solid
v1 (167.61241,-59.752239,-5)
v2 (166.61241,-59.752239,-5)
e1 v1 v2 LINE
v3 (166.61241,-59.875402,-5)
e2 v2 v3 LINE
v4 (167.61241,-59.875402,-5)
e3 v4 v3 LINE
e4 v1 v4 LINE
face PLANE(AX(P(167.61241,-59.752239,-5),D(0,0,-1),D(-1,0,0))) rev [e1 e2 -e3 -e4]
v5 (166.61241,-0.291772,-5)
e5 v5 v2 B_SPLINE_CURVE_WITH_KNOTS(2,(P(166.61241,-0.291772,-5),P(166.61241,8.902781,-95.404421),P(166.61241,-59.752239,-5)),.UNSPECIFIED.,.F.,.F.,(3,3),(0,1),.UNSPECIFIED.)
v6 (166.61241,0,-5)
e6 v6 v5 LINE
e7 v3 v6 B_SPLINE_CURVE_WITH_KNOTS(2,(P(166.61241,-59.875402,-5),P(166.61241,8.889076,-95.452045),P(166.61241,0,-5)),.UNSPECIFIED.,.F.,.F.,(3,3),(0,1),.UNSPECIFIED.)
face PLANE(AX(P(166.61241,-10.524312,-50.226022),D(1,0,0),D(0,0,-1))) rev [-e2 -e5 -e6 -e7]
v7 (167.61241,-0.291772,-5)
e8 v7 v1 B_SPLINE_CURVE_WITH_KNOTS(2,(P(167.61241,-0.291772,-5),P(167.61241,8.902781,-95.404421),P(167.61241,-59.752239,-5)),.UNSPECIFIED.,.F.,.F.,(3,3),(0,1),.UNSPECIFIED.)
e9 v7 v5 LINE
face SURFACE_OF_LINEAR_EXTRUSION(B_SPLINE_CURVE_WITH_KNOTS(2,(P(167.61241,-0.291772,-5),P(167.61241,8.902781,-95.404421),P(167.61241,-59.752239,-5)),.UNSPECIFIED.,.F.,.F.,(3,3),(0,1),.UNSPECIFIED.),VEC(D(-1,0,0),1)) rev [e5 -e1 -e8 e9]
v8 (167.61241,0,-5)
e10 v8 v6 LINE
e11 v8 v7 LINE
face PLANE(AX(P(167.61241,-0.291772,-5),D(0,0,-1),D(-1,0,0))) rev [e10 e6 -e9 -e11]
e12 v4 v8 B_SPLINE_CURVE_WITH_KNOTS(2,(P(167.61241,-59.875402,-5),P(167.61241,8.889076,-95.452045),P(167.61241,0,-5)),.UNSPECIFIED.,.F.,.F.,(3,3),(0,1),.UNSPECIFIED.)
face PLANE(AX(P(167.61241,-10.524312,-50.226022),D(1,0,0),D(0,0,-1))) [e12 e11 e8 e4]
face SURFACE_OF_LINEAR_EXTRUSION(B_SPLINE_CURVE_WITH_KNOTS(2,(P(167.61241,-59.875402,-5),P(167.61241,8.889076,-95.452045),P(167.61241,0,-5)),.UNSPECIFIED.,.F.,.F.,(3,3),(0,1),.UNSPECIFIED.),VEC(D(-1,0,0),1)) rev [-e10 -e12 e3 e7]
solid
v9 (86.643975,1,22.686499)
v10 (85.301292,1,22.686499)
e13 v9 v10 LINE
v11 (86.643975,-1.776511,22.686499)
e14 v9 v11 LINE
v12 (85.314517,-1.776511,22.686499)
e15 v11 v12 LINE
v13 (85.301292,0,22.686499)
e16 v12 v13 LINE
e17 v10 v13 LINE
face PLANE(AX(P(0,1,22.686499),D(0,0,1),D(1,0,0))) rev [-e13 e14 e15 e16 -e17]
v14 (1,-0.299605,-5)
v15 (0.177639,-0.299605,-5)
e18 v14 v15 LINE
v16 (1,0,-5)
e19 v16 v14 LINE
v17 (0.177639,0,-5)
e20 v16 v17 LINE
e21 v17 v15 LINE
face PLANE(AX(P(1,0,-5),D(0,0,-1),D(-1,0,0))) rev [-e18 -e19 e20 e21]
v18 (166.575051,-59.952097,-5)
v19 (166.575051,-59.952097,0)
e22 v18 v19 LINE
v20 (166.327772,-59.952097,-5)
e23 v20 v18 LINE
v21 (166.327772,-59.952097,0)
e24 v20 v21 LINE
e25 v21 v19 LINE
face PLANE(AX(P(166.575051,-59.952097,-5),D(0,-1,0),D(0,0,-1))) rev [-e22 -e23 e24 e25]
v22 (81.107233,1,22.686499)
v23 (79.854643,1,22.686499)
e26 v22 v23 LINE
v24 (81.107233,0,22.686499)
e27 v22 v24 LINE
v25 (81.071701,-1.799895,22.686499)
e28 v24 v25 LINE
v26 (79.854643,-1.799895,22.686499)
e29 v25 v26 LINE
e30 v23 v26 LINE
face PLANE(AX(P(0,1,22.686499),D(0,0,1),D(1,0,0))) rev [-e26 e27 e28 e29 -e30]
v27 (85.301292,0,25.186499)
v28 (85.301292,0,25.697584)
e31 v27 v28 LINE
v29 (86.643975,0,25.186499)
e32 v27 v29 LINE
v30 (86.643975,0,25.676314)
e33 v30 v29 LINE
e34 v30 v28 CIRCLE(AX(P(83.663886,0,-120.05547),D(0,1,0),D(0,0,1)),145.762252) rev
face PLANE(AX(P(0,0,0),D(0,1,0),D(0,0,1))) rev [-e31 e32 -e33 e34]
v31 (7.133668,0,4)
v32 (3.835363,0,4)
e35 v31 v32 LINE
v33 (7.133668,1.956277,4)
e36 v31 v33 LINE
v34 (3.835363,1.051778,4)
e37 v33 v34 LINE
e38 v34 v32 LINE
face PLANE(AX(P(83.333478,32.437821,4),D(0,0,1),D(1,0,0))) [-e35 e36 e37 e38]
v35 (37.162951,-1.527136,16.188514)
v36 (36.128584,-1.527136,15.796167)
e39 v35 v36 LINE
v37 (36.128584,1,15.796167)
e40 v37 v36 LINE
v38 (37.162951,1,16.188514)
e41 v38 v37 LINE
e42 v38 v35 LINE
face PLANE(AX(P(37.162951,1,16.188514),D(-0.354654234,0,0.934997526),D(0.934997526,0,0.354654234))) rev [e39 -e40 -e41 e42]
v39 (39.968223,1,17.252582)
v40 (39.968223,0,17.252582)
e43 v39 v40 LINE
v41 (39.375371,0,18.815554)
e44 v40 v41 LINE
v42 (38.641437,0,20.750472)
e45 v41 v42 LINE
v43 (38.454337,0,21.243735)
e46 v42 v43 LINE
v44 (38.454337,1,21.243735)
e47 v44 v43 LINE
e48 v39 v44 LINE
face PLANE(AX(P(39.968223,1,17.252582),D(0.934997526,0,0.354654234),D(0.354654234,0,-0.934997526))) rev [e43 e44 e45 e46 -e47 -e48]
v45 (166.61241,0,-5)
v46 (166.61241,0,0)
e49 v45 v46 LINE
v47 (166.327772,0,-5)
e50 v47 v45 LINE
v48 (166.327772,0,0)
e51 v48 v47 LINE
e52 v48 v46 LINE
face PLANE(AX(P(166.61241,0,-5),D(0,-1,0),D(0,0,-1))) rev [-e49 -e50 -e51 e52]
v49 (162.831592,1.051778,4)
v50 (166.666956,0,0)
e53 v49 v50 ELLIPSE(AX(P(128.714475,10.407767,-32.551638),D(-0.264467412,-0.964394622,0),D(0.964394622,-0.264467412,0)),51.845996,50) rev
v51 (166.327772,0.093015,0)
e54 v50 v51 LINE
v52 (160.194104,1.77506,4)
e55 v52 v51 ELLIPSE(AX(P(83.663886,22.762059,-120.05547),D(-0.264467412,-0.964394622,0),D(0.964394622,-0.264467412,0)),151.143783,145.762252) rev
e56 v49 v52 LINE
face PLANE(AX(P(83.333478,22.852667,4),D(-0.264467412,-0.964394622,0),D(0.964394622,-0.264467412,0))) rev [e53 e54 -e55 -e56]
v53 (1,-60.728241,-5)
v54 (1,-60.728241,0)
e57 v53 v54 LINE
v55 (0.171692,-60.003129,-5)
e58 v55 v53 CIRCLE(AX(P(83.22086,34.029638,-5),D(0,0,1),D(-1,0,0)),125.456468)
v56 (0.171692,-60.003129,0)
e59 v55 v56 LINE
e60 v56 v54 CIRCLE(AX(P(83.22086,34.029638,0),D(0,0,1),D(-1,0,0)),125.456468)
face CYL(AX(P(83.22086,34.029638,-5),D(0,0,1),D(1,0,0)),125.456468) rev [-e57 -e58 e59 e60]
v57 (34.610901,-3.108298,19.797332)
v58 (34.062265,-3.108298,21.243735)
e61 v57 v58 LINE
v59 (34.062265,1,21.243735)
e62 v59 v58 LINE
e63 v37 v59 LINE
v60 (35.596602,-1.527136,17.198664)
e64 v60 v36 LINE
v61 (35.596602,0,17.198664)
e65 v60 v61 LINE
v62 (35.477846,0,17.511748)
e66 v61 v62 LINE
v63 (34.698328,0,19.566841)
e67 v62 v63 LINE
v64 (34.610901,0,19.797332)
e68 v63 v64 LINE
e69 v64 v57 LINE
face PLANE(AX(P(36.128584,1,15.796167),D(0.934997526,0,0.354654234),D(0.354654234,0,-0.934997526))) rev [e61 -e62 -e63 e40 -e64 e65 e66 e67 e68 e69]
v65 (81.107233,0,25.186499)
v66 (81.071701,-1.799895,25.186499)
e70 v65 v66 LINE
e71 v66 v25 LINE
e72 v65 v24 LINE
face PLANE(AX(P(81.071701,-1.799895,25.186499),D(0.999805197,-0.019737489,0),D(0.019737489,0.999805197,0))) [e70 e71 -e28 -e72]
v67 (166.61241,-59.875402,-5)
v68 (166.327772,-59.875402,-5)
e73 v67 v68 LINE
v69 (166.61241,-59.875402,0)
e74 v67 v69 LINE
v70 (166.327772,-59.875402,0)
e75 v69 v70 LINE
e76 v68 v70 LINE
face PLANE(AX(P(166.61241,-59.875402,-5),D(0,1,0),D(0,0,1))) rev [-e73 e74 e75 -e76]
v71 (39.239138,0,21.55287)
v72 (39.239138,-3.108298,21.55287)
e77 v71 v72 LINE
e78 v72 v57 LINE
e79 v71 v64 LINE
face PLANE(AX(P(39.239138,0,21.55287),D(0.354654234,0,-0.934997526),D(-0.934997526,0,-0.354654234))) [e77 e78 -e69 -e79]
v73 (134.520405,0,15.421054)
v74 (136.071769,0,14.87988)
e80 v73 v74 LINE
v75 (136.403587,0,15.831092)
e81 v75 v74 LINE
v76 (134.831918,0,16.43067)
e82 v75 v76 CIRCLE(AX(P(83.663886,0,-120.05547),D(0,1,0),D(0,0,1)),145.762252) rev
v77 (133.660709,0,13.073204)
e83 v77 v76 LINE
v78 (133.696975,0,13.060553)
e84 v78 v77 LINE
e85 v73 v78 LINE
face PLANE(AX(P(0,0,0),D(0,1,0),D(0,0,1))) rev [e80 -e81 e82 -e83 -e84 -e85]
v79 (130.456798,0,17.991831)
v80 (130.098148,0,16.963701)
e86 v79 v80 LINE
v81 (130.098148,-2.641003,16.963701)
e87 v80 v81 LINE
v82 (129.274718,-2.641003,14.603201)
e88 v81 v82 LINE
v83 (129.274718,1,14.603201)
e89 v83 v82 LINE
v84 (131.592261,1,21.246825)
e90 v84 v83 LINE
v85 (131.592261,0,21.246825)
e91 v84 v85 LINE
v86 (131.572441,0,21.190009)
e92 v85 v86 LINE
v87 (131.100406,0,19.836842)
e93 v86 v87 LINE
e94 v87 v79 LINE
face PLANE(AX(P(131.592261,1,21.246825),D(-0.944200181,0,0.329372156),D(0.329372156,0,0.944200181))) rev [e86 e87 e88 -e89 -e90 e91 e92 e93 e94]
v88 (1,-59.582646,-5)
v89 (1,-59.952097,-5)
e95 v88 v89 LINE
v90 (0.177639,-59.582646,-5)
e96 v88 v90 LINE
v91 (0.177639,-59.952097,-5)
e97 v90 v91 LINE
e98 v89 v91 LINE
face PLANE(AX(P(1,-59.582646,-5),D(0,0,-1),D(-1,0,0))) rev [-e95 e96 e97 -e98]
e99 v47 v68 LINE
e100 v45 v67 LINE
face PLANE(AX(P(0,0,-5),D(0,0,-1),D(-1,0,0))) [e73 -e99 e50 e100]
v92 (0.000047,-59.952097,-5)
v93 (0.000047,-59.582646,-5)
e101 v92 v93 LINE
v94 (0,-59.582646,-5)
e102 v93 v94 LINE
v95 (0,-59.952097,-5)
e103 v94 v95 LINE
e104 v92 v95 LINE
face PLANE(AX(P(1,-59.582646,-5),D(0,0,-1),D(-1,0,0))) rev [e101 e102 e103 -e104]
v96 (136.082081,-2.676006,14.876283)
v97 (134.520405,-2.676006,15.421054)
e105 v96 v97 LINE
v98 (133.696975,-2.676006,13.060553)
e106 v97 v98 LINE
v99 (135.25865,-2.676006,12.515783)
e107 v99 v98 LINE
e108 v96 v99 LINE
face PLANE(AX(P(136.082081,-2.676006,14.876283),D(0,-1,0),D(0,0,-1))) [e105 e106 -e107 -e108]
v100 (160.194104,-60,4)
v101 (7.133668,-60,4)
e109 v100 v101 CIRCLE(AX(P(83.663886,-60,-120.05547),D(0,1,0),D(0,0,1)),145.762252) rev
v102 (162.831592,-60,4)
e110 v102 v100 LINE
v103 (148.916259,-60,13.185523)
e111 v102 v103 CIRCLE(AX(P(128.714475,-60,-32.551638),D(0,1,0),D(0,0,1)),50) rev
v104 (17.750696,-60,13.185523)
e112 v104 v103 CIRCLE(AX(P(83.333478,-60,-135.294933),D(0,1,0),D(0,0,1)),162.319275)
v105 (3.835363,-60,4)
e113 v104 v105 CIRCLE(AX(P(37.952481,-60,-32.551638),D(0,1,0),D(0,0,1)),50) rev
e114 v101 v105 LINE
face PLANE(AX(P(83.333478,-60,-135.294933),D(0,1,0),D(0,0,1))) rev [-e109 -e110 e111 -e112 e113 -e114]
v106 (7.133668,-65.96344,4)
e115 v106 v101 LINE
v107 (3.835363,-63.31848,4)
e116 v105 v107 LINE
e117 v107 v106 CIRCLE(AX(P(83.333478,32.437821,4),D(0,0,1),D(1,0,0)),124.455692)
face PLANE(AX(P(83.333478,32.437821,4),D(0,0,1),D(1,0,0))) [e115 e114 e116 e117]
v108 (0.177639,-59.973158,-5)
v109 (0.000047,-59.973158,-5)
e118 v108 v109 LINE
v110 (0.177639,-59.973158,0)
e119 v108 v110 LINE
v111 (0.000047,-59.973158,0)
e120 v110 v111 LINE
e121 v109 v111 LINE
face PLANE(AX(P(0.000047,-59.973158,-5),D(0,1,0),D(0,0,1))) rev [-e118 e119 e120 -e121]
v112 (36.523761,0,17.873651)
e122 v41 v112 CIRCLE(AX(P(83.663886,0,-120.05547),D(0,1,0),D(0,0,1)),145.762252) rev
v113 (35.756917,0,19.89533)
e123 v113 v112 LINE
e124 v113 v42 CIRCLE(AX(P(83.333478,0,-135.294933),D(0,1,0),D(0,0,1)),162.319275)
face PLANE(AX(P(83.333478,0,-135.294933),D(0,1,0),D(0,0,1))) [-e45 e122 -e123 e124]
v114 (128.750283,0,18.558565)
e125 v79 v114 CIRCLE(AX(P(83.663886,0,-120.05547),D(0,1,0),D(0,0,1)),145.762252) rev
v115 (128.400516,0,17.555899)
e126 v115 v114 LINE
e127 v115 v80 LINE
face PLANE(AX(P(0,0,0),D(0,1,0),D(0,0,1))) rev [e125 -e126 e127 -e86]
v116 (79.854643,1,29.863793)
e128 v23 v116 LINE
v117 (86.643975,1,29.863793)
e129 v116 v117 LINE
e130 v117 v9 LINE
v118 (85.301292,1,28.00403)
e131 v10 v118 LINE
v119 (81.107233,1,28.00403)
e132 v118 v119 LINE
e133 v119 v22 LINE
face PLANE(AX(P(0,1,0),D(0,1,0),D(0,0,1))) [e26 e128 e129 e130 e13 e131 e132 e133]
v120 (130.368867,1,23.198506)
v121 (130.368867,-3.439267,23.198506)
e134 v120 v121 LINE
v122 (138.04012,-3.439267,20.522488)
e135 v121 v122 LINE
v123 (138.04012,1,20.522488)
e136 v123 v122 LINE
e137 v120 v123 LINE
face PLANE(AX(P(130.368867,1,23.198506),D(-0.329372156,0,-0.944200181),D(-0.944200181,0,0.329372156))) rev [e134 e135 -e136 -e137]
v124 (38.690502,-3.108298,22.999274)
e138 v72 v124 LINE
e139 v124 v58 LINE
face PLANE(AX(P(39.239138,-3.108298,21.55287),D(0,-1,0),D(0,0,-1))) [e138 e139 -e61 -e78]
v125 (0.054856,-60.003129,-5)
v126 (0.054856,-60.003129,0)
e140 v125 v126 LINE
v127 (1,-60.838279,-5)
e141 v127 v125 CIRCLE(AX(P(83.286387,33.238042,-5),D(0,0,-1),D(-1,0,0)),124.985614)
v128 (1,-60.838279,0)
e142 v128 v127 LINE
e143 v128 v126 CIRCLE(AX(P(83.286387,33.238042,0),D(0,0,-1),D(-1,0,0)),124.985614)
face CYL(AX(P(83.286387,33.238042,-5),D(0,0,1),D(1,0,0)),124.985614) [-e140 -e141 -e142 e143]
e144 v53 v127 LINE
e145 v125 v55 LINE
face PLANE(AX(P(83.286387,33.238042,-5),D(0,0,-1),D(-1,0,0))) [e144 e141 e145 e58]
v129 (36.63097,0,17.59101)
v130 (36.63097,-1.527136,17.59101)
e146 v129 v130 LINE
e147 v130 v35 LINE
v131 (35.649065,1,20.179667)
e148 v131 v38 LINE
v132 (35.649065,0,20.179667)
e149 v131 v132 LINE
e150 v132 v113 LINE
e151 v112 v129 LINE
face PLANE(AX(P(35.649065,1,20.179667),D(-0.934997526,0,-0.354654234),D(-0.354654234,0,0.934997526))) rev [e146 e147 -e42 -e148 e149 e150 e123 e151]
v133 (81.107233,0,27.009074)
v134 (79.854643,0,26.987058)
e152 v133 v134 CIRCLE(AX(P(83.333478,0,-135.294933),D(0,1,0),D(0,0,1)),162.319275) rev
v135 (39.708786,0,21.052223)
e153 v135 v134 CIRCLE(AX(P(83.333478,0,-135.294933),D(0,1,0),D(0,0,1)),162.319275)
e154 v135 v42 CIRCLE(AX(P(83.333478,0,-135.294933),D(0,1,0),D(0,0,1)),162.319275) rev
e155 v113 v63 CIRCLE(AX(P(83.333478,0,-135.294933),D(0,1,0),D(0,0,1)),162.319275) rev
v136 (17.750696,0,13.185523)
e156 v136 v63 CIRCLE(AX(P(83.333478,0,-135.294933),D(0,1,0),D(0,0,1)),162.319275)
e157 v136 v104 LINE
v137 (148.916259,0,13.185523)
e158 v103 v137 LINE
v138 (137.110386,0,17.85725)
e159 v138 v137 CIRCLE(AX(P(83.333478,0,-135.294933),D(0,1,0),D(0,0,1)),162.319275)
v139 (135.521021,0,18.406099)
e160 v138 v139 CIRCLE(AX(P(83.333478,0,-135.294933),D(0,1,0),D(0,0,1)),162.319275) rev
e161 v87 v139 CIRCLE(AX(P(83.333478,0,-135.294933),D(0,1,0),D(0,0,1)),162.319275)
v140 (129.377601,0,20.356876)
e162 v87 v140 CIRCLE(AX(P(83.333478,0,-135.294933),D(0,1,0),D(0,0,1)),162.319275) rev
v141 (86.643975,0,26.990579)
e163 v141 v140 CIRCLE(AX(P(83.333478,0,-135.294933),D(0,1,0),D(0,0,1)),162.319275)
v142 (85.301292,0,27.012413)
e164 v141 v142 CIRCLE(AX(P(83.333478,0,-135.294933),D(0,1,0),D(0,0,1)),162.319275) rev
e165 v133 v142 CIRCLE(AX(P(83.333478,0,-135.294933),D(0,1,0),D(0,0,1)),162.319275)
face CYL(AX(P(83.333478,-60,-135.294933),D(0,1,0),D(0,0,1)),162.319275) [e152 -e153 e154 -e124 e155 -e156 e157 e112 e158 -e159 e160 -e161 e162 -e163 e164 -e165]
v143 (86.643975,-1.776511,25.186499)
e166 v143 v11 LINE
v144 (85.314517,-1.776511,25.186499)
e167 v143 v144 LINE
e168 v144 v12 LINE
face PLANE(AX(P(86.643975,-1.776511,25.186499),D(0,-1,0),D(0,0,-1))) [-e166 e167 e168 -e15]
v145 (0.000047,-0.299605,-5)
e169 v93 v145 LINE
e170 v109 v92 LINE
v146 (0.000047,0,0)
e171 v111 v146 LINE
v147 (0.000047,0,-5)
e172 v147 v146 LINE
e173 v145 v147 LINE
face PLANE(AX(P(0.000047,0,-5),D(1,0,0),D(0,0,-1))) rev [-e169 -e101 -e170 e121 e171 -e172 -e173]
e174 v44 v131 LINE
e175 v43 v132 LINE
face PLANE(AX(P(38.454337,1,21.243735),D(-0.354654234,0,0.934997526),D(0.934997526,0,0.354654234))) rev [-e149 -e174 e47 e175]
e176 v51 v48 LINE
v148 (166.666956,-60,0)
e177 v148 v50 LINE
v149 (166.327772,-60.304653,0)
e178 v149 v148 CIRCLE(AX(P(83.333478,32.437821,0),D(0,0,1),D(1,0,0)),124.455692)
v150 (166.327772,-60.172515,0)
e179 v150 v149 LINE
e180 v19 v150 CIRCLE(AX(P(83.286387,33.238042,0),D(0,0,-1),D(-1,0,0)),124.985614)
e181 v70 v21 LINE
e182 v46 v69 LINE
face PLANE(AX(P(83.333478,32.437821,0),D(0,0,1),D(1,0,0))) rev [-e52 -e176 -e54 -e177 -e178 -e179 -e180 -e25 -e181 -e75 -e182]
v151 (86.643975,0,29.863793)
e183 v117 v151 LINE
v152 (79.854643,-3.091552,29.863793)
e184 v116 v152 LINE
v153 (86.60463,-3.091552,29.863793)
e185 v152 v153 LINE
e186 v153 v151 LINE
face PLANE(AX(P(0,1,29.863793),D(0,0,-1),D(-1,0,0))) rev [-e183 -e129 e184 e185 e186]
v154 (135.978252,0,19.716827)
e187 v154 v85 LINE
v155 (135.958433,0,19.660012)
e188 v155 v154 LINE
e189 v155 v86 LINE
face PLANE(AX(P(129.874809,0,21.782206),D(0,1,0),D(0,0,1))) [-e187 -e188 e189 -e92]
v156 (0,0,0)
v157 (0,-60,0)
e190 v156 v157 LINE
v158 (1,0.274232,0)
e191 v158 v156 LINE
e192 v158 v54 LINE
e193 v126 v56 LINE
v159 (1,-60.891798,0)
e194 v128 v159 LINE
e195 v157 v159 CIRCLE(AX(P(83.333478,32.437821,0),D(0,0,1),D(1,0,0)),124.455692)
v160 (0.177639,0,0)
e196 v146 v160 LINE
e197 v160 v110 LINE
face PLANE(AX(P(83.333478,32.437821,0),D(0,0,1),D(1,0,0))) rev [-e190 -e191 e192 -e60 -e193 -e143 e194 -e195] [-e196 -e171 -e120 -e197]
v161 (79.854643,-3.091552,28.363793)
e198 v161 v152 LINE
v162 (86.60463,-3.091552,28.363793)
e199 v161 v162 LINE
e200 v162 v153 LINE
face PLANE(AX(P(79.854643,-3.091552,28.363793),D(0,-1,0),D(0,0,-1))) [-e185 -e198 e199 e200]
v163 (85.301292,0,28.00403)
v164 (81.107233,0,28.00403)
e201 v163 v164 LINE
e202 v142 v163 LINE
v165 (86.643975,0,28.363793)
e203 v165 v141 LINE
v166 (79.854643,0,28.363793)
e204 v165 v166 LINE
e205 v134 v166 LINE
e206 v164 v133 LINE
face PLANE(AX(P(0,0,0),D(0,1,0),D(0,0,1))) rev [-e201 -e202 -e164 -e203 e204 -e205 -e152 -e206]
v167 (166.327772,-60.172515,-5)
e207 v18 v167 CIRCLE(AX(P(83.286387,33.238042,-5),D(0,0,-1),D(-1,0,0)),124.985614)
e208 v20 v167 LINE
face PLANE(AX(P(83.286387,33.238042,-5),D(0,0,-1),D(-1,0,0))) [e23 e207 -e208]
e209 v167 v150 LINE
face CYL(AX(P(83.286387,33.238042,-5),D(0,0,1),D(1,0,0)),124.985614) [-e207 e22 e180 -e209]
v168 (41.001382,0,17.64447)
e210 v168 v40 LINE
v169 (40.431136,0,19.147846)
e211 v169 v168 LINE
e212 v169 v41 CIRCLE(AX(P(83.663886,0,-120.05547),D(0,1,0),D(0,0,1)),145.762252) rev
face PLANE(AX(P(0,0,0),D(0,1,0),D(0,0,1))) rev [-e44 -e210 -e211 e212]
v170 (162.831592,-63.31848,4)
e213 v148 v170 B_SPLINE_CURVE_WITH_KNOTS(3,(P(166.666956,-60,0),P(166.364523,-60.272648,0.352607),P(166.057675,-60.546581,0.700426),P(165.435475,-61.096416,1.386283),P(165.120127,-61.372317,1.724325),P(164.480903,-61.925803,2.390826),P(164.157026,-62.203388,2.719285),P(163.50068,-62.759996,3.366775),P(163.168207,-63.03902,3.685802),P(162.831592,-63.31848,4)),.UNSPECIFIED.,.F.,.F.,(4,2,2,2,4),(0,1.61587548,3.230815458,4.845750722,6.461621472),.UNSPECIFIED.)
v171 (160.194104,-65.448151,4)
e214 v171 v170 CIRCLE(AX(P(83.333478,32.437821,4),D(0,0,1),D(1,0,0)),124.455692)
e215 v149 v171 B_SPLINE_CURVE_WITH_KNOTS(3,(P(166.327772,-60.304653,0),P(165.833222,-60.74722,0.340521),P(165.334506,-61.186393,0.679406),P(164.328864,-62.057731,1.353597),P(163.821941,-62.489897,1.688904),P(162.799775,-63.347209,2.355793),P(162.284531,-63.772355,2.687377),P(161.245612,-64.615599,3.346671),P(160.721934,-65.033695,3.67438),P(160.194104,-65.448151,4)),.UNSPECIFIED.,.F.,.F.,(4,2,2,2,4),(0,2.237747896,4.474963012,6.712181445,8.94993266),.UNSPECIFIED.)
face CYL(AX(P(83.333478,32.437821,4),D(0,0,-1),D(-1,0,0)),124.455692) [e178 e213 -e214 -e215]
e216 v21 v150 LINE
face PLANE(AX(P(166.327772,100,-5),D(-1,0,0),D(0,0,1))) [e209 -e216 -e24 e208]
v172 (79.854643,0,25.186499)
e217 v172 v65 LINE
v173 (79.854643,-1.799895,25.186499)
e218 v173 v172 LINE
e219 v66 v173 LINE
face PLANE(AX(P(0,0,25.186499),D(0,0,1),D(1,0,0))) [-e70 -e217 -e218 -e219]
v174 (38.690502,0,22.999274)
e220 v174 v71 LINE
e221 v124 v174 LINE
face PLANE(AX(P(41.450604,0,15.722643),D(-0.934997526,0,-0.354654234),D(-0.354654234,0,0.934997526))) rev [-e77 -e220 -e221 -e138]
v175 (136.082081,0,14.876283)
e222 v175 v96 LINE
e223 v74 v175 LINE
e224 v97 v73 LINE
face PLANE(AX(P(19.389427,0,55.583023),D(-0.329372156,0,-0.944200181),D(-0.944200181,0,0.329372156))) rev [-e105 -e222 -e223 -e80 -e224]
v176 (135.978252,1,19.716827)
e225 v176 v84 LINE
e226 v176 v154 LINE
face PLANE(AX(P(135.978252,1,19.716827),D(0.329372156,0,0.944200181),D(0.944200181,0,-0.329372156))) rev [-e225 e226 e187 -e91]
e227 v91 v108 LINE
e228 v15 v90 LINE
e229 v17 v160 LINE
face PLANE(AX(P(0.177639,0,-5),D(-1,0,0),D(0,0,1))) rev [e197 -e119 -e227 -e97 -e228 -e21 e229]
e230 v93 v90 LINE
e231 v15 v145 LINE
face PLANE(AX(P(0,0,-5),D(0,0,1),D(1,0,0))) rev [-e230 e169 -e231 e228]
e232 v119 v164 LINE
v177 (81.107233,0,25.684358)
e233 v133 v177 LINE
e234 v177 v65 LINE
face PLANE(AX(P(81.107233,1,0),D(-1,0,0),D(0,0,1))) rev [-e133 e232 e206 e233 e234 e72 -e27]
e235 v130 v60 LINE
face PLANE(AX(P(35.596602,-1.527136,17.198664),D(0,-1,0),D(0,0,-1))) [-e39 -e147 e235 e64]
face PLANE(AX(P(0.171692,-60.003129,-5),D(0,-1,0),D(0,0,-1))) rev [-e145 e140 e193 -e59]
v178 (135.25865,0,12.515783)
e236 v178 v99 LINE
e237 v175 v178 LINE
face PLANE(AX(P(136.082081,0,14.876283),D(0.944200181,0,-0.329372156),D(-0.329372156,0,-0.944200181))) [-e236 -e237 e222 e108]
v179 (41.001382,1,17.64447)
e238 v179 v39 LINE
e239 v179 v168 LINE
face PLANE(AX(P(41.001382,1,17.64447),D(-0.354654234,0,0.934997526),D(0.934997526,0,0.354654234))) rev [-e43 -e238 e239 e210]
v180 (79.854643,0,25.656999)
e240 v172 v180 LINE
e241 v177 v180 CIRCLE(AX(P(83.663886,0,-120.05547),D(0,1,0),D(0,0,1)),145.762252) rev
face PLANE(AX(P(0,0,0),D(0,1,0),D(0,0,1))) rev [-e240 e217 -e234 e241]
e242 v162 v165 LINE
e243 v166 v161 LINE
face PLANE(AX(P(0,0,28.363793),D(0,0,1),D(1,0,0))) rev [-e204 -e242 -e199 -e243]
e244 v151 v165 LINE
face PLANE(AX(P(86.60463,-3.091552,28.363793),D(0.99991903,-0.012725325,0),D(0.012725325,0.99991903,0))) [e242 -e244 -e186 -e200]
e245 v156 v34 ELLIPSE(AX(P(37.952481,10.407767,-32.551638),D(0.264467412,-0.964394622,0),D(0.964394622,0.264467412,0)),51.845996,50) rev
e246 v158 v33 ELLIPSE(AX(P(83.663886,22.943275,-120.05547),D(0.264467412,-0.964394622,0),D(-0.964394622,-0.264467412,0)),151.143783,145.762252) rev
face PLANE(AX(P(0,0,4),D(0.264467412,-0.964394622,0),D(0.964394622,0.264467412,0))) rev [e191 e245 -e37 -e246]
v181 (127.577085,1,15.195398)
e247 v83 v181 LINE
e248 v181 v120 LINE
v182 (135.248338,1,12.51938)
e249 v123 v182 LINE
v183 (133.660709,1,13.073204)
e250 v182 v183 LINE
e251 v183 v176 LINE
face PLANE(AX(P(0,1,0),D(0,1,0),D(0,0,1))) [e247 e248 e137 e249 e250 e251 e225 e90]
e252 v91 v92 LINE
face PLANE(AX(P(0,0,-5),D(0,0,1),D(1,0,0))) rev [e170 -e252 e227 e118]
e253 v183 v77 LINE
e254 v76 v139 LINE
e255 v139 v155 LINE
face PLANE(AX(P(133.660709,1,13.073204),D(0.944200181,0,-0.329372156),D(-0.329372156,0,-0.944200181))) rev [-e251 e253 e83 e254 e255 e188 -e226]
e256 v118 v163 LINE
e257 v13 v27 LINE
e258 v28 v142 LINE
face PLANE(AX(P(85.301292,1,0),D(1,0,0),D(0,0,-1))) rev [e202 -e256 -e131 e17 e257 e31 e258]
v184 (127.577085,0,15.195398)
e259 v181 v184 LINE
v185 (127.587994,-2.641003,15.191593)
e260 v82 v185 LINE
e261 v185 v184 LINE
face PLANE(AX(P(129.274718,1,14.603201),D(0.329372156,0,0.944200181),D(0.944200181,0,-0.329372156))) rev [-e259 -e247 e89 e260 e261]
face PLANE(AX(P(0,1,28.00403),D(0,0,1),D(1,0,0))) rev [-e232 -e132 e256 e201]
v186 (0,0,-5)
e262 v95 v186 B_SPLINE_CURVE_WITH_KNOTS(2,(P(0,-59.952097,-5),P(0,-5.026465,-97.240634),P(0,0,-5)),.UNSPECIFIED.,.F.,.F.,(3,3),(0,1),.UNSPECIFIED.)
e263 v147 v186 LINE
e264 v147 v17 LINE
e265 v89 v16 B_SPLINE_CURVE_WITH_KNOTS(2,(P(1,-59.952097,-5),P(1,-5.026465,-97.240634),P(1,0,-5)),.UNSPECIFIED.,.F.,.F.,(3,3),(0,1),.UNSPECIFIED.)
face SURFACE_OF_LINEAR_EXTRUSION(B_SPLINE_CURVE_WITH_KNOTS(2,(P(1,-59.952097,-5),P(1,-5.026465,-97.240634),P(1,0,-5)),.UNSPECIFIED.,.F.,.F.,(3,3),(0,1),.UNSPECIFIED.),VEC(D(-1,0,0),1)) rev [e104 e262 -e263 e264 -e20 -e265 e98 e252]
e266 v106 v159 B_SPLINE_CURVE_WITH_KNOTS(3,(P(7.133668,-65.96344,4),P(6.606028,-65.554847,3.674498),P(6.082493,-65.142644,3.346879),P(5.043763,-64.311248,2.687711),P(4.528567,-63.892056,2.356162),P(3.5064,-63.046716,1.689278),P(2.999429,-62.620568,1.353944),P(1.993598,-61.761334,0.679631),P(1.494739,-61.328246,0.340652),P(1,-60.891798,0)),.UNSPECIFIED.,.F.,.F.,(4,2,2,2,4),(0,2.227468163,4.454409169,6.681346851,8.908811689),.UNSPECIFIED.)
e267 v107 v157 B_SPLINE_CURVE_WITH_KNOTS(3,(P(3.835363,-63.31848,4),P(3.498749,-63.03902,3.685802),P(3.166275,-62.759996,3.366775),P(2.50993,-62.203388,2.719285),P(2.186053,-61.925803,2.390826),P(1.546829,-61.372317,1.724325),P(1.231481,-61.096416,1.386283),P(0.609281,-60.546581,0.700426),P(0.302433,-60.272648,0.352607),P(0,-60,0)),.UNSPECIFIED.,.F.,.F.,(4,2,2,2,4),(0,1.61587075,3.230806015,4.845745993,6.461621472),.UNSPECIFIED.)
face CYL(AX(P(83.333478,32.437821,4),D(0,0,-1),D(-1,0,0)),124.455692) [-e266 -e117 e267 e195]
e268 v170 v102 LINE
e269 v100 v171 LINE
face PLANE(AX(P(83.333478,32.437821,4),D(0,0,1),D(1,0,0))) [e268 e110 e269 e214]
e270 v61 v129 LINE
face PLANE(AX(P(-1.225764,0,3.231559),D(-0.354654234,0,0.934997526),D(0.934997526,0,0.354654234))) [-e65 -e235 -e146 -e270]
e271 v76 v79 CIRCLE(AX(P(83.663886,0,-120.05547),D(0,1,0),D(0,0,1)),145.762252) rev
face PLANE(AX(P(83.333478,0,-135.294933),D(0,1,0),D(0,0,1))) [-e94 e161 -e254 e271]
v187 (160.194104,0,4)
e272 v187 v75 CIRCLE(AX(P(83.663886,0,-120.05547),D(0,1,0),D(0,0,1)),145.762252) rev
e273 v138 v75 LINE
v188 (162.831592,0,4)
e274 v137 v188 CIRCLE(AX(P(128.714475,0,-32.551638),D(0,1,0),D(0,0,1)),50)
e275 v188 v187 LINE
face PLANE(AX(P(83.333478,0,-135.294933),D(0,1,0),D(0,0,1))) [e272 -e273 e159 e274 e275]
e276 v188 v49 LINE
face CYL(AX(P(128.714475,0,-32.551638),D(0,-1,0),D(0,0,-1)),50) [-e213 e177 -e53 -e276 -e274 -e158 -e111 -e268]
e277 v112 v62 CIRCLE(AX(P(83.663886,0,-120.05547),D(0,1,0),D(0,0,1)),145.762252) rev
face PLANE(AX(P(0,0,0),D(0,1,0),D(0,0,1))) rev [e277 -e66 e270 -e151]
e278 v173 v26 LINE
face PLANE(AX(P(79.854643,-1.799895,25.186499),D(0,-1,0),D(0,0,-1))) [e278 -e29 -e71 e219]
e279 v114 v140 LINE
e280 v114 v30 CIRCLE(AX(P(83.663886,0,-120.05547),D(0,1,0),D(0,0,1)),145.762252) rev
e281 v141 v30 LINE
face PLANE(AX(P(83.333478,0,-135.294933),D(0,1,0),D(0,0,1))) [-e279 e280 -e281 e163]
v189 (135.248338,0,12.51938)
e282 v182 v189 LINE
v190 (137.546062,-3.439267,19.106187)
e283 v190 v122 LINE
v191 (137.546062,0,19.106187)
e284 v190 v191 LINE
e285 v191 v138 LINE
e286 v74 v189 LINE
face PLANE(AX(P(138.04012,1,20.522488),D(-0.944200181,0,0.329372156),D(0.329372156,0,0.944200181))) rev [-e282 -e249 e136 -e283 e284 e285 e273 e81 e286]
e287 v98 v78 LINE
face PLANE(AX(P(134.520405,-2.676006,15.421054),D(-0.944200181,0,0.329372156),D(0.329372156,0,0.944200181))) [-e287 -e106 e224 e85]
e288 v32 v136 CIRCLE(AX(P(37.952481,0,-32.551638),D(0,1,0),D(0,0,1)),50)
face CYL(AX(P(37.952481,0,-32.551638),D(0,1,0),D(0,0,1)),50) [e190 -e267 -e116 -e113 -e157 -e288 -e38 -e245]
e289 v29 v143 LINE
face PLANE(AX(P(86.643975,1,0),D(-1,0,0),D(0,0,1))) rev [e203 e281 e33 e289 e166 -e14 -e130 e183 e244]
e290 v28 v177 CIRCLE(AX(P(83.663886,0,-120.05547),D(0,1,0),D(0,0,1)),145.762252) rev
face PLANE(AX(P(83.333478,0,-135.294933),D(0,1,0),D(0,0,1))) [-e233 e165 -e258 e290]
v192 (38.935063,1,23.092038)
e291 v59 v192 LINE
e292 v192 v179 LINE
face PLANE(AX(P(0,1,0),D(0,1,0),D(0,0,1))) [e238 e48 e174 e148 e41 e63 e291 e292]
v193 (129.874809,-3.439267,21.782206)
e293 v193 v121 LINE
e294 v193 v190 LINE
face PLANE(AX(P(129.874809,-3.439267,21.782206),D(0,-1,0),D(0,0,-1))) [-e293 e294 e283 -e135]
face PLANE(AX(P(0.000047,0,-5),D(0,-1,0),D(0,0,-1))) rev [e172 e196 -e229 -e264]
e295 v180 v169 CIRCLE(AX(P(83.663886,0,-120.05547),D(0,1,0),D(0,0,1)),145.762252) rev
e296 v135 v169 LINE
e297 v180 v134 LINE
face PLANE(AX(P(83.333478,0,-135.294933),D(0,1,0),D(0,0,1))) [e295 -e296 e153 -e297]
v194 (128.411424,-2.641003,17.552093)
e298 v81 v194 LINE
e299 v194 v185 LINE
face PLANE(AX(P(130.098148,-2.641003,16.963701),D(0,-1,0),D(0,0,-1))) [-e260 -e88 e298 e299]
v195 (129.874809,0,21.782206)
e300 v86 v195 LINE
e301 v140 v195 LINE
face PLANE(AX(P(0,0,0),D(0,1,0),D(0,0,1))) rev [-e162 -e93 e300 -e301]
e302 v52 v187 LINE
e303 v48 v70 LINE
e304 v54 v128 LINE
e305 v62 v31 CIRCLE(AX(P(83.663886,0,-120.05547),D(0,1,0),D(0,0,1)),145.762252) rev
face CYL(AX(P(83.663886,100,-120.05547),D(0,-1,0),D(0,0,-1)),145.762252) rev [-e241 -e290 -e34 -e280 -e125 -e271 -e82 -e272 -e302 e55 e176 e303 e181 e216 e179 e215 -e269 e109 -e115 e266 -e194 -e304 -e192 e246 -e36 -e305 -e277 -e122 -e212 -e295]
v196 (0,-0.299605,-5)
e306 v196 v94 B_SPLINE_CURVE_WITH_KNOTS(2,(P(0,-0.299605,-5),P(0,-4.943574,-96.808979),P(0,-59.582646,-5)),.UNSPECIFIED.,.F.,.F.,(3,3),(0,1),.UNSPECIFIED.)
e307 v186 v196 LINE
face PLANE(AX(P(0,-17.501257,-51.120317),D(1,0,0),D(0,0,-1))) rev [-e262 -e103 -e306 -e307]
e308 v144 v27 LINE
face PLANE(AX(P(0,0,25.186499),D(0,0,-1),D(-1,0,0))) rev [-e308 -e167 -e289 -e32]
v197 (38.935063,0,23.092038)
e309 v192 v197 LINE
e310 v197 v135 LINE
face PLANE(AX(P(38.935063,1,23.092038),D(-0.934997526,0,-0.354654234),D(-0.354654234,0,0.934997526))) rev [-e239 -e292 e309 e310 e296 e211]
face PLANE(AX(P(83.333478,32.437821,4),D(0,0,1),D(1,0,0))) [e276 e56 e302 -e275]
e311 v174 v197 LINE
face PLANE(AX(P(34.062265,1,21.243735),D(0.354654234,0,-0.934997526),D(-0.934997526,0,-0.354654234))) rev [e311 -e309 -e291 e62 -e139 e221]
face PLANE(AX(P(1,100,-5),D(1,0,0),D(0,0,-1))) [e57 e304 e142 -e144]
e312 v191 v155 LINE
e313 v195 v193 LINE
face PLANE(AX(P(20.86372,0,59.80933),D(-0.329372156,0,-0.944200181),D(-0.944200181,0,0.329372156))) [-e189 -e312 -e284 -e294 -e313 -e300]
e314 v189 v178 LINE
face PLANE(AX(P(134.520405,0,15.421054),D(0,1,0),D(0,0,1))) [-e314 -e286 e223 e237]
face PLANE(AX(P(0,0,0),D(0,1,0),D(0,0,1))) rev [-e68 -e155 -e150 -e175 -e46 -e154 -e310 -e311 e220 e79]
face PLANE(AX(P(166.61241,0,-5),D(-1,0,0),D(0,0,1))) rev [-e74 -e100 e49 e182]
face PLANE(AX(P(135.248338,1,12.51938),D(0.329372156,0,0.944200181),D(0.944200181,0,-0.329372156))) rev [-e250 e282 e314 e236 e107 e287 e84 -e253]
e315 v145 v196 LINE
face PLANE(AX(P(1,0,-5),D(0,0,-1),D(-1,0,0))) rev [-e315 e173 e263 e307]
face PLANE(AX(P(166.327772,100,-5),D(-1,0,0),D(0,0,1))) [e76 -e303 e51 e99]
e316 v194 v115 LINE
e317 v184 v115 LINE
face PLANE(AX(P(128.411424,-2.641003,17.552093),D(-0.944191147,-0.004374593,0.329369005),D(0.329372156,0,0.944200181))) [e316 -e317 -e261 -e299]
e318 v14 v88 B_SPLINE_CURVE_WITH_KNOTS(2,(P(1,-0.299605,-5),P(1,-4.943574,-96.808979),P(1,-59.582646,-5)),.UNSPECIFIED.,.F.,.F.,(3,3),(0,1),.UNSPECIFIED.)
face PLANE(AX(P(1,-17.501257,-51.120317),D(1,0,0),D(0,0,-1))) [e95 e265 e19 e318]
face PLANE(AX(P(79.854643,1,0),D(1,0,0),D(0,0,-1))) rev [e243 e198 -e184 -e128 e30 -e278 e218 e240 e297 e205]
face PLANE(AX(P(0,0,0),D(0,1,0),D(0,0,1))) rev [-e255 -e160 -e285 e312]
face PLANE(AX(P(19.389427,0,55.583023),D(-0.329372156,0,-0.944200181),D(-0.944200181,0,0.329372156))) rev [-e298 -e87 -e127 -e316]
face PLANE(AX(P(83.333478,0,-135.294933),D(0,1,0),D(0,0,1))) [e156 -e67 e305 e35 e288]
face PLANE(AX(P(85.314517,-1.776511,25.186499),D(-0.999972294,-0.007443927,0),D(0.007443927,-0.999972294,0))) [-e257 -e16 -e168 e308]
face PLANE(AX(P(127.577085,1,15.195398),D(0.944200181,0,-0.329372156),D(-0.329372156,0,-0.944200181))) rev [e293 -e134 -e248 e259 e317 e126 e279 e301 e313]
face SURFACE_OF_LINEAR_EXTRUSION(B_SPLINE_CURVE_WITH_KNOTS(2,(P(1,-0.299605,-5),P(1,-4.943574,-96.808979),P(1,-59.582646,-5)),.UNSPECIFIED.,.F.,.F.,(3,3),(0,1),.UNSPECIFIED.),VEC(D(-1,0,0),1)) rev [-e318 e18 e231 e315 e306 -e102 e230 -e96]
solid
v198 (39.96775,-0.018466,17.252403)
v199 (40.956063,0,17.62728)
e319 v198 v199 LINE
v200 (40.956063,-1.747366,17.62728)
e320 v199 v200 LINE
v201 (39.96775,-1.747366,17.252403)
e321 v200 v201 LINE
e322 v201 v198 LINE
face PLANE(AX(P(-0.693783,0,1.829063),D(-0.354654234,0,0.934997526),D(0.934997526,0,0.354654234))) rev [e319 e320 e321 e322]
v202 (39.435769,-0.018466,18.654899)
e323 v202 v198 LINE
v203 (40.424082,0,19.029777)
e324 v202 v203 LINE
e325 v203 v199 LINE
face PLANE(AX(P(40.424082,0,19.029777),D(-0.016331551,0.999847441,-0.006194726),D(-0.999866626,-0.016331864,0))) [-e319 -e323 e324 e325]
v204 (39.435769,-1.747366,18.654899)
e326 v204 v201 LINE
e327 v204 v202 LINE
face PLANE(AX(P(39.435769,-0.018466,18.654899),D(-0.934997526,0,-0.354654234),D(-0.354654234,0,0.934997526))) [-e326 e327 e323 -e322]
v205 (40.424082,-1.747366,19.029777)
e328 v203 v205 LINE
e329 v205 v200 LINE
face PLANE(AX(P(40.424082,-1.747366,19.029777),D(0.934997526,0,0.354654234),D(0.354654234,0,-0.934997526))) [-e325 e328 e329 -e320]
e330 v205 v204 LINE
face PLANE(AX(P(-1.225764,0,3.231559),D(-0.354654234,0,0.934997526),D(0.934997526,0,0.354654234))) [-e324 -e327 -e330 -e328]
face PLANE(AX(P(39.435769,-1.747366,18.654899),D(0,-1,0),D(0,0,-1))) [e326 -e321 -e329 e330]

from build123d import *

# Parameters (mm, degrees)
SALIENTE_EXTRUIR1_DEPTH    = 4
SALIENTE_EXTRUIR2_DEPTH    = 60
CROQUIS3_W                 = 0.289029692
CROQUIS3_H                 = 59.87540196
CROQUIS3_W_2               = 0.177592091
CROQUIS3_H_2               = 59.973158088
SALIENTE_EXTRUIR3_DEPTH    = 5
SALIENTE_EXTRUIR4_DEPTH    = 5
REDONDEO1_R                = 50
REDONDEO2_R                = 50
SALIENTE_EXTRUIR5_DEPTH    = 1
SALIENTE_EXTRUIR6_DEPTH    = 1
CORTAR_EXTRUIR6_DEPTH      = 100
CORTAR_EXTRUIR6_DEPTH_BACK = 100
SALIENTE_EXTRUIR8_DEPTH    = 1
CROQUIS14_W                = 1.546959861
CROQUIS14_H                = 3.108298136
SALIENTE_EXTRUIR9_DEPTH    = 4.95
CROQUIS17_W                = 1.106278156
CROQUIS17_H                = 1.527135833
SALIENTE_EXTRUIR10_DEPTH   = 1.5
SALIENTE_EXTRUIR11_DEPTH   = 1.5
SALIENTE_EXTRUIR20_DEPTH   = 1
SALIENTE_EXTRUIR21_DEPTH   = 2.5
SALIENTE_EXTRUIR22_DEPTH   = 2.5
SALIENTE_EXTRUIR23_DEPTH   = 1.5
SALIENTE_EXTRUIR24_DEPTH   = 1
CROQUIS25_W                = 8.124604313
CROQUIS25_H                = 3.439267379
SALIENTE_EXTRUIR26_DEPTH   = 1.5
CROQUIS26_W                = 1.653966606
CROQUIS26_H                = 2.676005595
SALIENTE_EXTRUIR27_DEPTH   = 2.5
SALIENTE_EXTRUIR28_DEPTH   = 2.5


with BuildPart() as part:
    # Croquis1 → Saliente-Extruir1 (new body)
    with BuildSketch(Plane.XY):
        with BuildLine():
            Line((0, 0), (83.333477934, 22.852667115))
            Line((83.333477934, 22.852667115), (166.666955868, 0))
            Line((166.666955868, 0), (166.666955868, -60))
            ThreePointArc((166.666955868, -60), (83.333477934, -92.017871072), (0, -60))
            Line((0, -60), (0, 0))
        make_face()
    extrude(amount=SALIENTE_EXTRUIR1_DEPTH)

    # Croquis2 → Saliente-Extruir2 (add)
    with BuildSketch(Plane(origin=(0, 0, 0), x_dir=(1, 0, 0), z_dir=(0, 1, 0))):
        with BuildLine():
            Line((0, -4), (166.666955868, -4))
            ThreePointArc((166.666955868, -4), (83.333477934, -27.024341585), (0, -4))
        make_face()
    extrude(amount=-SALIENTE_EXTRUIR2_DEPTH)

    # Croquis3 → Saliente-Extruir3 (add)
    with BuildSketch(Plane(origin=(0, 0, 0), x_dir=(-1, 0, 0), z_dir=(0, 0, -1))):
        with Locations((-166.467895628, -29.93770098)):
            Rectangle(CROQUIS3_W, CROQUIS3_H)
        with Locations((-0.088843275, -29.986579044)):
            Rectangle(CROQUIS3_W_2, CROQUIS3_H_2)
    extrude(amount=SALIENTE_EXTRUIR3_DEPTH)

    # Croquis4 → Saliente-Extruir4 (add)
    with BuildSketch(Plane(origin=(0, 0, 0), x_dir=(-1, 0, 0), z_dir=(0, 0, -1))):
        with BuildLine():
            Line((-166.575051433, -59.952097452), (-166.327771804, -59.952097452))
            ThreePointArc((-166.327771804, -59.952097452), (-83.259391035, -91.42682448), (-0.171692336, -60.003128804))
            Line((-0.171692336, -60.003128804), (-0.054856283, -60.003128804))
            ThreePointArc((-0.054856283, -60.003128804), (-83.324689996, -91.747566021), (-166.575051433, -59.952097452))
        make_face()
    extrude(amount=SALIENTE_EXTRUIR4_DEPTH)

    # Redondeo1
    # the kernel refuses this fillet: 50 mm, written as the material it takes off along each edge
    with BuildSketch(Plane(origin=(166.666955868, 49.966304068, 4), x_dir=(0, 0, -1), z_dir=(0, -1, 0))) as redondeo1_piece_1:
        with BuildLine():
            CenterArc((36.551638367, -37.952481337), REDONDEO1_R, 130.619513434, 25.549773404)
            Line((-9.185522516, -17.750696405), (-10.100265733, -17.346660707))
            ThreePointArc((-10.100265733, -17.346660707), (-5.754361432, -8.274250403), (-0.858153989, 0.513392375))
            Line((-0.858153989, 0.513392375), (0, 1))
            ThreePointArc((0, 1), (2, 1), (3.348967233, 0.759049627))
            Line((3.348967233, 0.759049627), (4, 0))
        make_face()
    extrude(amount=159.932608137, mode=Mode.SUBTRACT)

    # Redondeo2
    # the kernel refuses this fillet: 50 mm, written as the material it takes off along each edge
    with BuildSketch(Plane(origin=(0, -109.966304068, 4), x_dir=(0, 0, -1), z_dir=(0, 1, 0))) as redondeo2_piece_1:
        with BuildLine():
            CenterArc((36.551638367, -37.952481337), REDONDEO2_R, 130.619513434, 25.549773404)
            Line((-9.185522516, -17.750696405), (-10.100265733, -17.346660707))
            ThreePointArc((-10.100265733, -17.346660707), (-5.754361432, -8.274250403), (-0.858153989, 0.513392375))
            Line((-0.858153989, 0.513392375), (0, 1))
            ThreePointArc((0, 1), (2, 1), (3.348967233, 0.759049627))
            Line((3.348967233, 0.759049627), (4, 0))
        make_face()
    extrude(amount=159.932608137, mode=Mode.SUBTRACT)

    # Croquis6 → Saliente-Extruir5 (add)
    with BuildSketch(Plane(origin=(0, 0, 0), x_dir=(0, 0, -1), z_dir=(1, 0, 0))):
        with BuildLine():
            Line((5, 0), (5, -0.29960532))
            add(Edge.make_bspline(
                [(5, -0.29960532), (96.808979423, -4.943573918), (5, -59.582645774)],
                knots=[0, 0, 0, 1, 1, 1], degree=2))
            Line((5, -59.582645774), (5, -59.952097452))
            add(Edge.make_bspline(
                [(5, 0), (97.240633966, -5.026465085), (5, -59.952097452)],
                knots=[0, 0, 0, 1, 1, 1], degree=2))
        make_face()
    extrude(amount=SALIENTE_EXTRUIR5_DEPTH)

    # Croquis9 → Cortar-Extruir6 (cut, two sides: drawn at the far end of the back side and taken through both)
    with BuildSketch(Plane(origin=(0, 0, 0), x_dir=(1, 0, 0), z_dir=(0, 1, 0)).offset(-CORTAR_EXTRUIR6_DEPTH_BACK)):
        with BuildLine():
            Line((1, 5), (166.327771804, 5))
            Line((166.327771804, 5), (166.327771804, 0))
            ThreePointArc((166.327771804, 0), (83.663885902, -25.706781267), (1, 0))
            Line((1, 0), (1, 5))
        make_face()
    extrude(amount=CORTAR_EXTRUIR6_DEPTH + CORTAR_EXTRUIR6_DEPTH_BACK, mode=Mode.SUBTRACT)

    # Croquis11 → Saliente-Extruir8 (add)
    with BuildSketch(Plane(origin=(0, 0, 0), x_dir=(1, 0, 0), z_dir=(0, 1, 0))):
        Polygon((36.128583572, -15.796167366), (34.062264647, -21.243735439), (38.935063324, -23.092038385), (41.001382248, -17.644470312), (39.968222786, -17.25258224), (38.45433709, -21.243735439), (35.649065215, -20.179666797), (37.162950911, -16.188513598), align=None)
    extrude(amount=SALIENTE_EXTRUIR8_DEPTH)

    # Croquis14 → Saliente-Extruir9 (add)
    with BuildSketch(Plane(origin=(36.822366085, 0, 13.967104377), x_dir=(-0.3546542341205386, 0, 0.9349975263177835), z_dir=(-0.9349975263177834, 0, -0.35465423412053854))):
        with Locations((7.009033774, -1.554149068)):
            Rectangle(CROQUIS14_W, CROQUIS14_H)
    extrude(amount=-SALIENTE_EXTRUIR9_DEPTH)

    # Croquis17 → Saliente-Extruir10 (add)
    with BuildSketch(Plane(origin=(-0.693782513, 0, 1.829062989), x_dir=(-0.9349975263177834, 0, -0.3546542341205389), z_dir=(0.35465423412053887, 0, -0.9349975263177833))):
        with Locations((-39.935452986, -0.763567916)):
            Rectangle(CROQUIS17_W, CROQUIS17_H)
    extrude(amount=-SALIENTE_EXTRUIR10_DEPTH)

    # Croquis19 → Saliente-Extruir20 (add)
    with BuildSketch(Plane(origin=(0, 0, 0), x_dir=(1, 0, 0), z_dir=(0, 1, 0))):
        Polygon((81.107233495, -28.004030405), (81.107233495, -22.686499047), (79.854642746, -22.686499047), (79.854642746, -29.86379276), (86.643974636, -29.86379276), (86.643974636, -22.686499047), (85.30129239, -22.686499047), (85.30129239, -28.004030405), align=None)
    extrude(amount=SALIENTE_EXTRUIR20_DEPTH)

    # Croquis20 → Saliente-Extruir21 (add)
    with BuildSketch(Plane(origin=(0, 0, 22.686499047), x_dir=(-1, 0, 0), z_dir=(0, 0, -1))):
        Polygon((-86.643974636, 0), (-86.643974636, -1.776510708), (-85.314516973, -1.776510708), (-85.30129239, 0), align=None)
    extrude(amount=-SALIENTE_EXTRUIR21_DEPTH)

    # Croquis22 → Saliente-Extruir22 (add)
    with BuildSketch(Plane(origin=(0, 0, 22.686499047), x_dir=(-1, 0, 0), z_dir=(0, 0, -1))):
        Polygon((-79.854642746, 0), (-79.854642746, -1.799894924), (-81.071701167, -1.799894924), (-81.107233495, 0), align=None)
    extrude(amount=-SALIENTE_EXTRUIR22_DEPTH)

    # Croquis23 → Saliente-Extruir23 (add)
    with BuildSketch(Plane.XY.offset(29.86379276)):
        Polygon((79.854642746, 0), (79.854642746, -3.091551628), (86.604630452, -3.091551628), (86.643974636, 0), align=None)
    extrude(amount=-SALIENTE_EXTRUIR23_DEPTH)

    # Croquis24 → Saliente-Extruir24 (add)
    with BuildSketch(Plane(origin=(0, 0, 0), x_dir=(1, 0, 0), z_dir=(0, 1, 0))):
        Polygon((127.577085334, -15.195398317), (130.368867149, -23.198506187), (138.040120015, -20.522487745), (135.2483382, -12.519379875), (133.660709286, -13.073203915), (135.978252363, -19.716827403), (131.59226066, -21.246824508), (129.274717583, -14.603201021), align=None)
    extrude(amount=SALIENTE_EXTRUIR24_DEPTH)

    # Croquis25 → Saliente-Extruir26 (add)
    with BuildSketch(Plane(origin=(21.357778013, 0, 61.225630304), x_dir=(0.9442001814457763, 0, -0.3293721563182948), z_dir=(0.32937215631829475, 0, 0.9442001814457762))):
        with Locations((119.515668168, -1.71963369)):
            Rectangle(CROQUIS25_W, CROQUIS25_H)
    extrude(amount=-SALIENTE_EXTRUIR26_DEPTH)

    # Croquis26 → Saliente-Extruir27 (add)
    with BuildSketch(Plane(origin=(18.565996198, 0, 53.222522434), x_dir=(-0.9442001814457758, 0, 0.3293721563182962), z_dir=(-0.3293721563182962, 0, -0.9442001814457758))):
        with Locations((-122.761908505, -1.338002798)):
            Rectangle(CROQUIS26_W, CROQUIS26_H)
    extrude(amount=-SALIENTE_EXTRUIR27_DEPTH)

    # Croquis27 → Saliente-Extruir28 (add)
    with BuildSketch(Plane(origin=(18.565996198, 0, 53.222522434), x_dir=(-0.9442001814457753, 0, 0.3293721563182975), z_dir=(-0.3293721563182975, 0, -0.9442001814457753))):
        Polygon((-117.251323989, 0), (-117.251323989, -2.641002762), (-115.464919434, -2.641002762), (-115.453366011, 0), align=None)
    extrude(amount=-SALIENTE_EXTRUIR28_DEPTH)


with BuildPart() as body_2:
    # Croquis8 → Saliente-Extruir6 (new body)
    with BuildSketch(Plane(origin=(166.612410474, 0, 0), x_dir=(0, 0, -1), z_dir=(1, 0, 0))):
        with BuildLine():
            Line((5, -0.29177164), (5, 0))
            add(Edge.make_bspline(
                [(5, 0), (95.452044638, 8.889076333), (5, -59.87540196)],
                knots=[0, 0, 0, 1, 1, 1], degree=2))
            Line((5, -59.87540196), (5, -59.752239474))
            add(Edge.make_bspline(
                [(5, -0.29177164), (95.404420621, 8.902780741), (5, -59.752239474)],
                knots=[0, 0, 0, 1, 1, 1], degree=2))
        make_face()
    extrude(amount=SALIENTE_EXTRUIR6_DEPTH)


with BuildPart() as body_3:
    # Croquis18 → Saliente-Extruir11 (new body)
    with BuildSketch(Plane(origin=(-0.693782513, 0, 1.829062989), x_dir=(-0.9349975263177843, 0, -0.35465423412053654), z_dir=(0.3546542341205365, 0, -0.9349975263177842))):
        Polygon((-43.488385393, -0.018465758), (-43.488385393, -1.747366455), (-44.545407148, -1.747366455), (-44.545407148, 0), align=None)
    extrude(amount=-SALIENTE_EXTRUIR11_DEPTH)


solid = Compound([part.part, body_2.part, body_3.part])
